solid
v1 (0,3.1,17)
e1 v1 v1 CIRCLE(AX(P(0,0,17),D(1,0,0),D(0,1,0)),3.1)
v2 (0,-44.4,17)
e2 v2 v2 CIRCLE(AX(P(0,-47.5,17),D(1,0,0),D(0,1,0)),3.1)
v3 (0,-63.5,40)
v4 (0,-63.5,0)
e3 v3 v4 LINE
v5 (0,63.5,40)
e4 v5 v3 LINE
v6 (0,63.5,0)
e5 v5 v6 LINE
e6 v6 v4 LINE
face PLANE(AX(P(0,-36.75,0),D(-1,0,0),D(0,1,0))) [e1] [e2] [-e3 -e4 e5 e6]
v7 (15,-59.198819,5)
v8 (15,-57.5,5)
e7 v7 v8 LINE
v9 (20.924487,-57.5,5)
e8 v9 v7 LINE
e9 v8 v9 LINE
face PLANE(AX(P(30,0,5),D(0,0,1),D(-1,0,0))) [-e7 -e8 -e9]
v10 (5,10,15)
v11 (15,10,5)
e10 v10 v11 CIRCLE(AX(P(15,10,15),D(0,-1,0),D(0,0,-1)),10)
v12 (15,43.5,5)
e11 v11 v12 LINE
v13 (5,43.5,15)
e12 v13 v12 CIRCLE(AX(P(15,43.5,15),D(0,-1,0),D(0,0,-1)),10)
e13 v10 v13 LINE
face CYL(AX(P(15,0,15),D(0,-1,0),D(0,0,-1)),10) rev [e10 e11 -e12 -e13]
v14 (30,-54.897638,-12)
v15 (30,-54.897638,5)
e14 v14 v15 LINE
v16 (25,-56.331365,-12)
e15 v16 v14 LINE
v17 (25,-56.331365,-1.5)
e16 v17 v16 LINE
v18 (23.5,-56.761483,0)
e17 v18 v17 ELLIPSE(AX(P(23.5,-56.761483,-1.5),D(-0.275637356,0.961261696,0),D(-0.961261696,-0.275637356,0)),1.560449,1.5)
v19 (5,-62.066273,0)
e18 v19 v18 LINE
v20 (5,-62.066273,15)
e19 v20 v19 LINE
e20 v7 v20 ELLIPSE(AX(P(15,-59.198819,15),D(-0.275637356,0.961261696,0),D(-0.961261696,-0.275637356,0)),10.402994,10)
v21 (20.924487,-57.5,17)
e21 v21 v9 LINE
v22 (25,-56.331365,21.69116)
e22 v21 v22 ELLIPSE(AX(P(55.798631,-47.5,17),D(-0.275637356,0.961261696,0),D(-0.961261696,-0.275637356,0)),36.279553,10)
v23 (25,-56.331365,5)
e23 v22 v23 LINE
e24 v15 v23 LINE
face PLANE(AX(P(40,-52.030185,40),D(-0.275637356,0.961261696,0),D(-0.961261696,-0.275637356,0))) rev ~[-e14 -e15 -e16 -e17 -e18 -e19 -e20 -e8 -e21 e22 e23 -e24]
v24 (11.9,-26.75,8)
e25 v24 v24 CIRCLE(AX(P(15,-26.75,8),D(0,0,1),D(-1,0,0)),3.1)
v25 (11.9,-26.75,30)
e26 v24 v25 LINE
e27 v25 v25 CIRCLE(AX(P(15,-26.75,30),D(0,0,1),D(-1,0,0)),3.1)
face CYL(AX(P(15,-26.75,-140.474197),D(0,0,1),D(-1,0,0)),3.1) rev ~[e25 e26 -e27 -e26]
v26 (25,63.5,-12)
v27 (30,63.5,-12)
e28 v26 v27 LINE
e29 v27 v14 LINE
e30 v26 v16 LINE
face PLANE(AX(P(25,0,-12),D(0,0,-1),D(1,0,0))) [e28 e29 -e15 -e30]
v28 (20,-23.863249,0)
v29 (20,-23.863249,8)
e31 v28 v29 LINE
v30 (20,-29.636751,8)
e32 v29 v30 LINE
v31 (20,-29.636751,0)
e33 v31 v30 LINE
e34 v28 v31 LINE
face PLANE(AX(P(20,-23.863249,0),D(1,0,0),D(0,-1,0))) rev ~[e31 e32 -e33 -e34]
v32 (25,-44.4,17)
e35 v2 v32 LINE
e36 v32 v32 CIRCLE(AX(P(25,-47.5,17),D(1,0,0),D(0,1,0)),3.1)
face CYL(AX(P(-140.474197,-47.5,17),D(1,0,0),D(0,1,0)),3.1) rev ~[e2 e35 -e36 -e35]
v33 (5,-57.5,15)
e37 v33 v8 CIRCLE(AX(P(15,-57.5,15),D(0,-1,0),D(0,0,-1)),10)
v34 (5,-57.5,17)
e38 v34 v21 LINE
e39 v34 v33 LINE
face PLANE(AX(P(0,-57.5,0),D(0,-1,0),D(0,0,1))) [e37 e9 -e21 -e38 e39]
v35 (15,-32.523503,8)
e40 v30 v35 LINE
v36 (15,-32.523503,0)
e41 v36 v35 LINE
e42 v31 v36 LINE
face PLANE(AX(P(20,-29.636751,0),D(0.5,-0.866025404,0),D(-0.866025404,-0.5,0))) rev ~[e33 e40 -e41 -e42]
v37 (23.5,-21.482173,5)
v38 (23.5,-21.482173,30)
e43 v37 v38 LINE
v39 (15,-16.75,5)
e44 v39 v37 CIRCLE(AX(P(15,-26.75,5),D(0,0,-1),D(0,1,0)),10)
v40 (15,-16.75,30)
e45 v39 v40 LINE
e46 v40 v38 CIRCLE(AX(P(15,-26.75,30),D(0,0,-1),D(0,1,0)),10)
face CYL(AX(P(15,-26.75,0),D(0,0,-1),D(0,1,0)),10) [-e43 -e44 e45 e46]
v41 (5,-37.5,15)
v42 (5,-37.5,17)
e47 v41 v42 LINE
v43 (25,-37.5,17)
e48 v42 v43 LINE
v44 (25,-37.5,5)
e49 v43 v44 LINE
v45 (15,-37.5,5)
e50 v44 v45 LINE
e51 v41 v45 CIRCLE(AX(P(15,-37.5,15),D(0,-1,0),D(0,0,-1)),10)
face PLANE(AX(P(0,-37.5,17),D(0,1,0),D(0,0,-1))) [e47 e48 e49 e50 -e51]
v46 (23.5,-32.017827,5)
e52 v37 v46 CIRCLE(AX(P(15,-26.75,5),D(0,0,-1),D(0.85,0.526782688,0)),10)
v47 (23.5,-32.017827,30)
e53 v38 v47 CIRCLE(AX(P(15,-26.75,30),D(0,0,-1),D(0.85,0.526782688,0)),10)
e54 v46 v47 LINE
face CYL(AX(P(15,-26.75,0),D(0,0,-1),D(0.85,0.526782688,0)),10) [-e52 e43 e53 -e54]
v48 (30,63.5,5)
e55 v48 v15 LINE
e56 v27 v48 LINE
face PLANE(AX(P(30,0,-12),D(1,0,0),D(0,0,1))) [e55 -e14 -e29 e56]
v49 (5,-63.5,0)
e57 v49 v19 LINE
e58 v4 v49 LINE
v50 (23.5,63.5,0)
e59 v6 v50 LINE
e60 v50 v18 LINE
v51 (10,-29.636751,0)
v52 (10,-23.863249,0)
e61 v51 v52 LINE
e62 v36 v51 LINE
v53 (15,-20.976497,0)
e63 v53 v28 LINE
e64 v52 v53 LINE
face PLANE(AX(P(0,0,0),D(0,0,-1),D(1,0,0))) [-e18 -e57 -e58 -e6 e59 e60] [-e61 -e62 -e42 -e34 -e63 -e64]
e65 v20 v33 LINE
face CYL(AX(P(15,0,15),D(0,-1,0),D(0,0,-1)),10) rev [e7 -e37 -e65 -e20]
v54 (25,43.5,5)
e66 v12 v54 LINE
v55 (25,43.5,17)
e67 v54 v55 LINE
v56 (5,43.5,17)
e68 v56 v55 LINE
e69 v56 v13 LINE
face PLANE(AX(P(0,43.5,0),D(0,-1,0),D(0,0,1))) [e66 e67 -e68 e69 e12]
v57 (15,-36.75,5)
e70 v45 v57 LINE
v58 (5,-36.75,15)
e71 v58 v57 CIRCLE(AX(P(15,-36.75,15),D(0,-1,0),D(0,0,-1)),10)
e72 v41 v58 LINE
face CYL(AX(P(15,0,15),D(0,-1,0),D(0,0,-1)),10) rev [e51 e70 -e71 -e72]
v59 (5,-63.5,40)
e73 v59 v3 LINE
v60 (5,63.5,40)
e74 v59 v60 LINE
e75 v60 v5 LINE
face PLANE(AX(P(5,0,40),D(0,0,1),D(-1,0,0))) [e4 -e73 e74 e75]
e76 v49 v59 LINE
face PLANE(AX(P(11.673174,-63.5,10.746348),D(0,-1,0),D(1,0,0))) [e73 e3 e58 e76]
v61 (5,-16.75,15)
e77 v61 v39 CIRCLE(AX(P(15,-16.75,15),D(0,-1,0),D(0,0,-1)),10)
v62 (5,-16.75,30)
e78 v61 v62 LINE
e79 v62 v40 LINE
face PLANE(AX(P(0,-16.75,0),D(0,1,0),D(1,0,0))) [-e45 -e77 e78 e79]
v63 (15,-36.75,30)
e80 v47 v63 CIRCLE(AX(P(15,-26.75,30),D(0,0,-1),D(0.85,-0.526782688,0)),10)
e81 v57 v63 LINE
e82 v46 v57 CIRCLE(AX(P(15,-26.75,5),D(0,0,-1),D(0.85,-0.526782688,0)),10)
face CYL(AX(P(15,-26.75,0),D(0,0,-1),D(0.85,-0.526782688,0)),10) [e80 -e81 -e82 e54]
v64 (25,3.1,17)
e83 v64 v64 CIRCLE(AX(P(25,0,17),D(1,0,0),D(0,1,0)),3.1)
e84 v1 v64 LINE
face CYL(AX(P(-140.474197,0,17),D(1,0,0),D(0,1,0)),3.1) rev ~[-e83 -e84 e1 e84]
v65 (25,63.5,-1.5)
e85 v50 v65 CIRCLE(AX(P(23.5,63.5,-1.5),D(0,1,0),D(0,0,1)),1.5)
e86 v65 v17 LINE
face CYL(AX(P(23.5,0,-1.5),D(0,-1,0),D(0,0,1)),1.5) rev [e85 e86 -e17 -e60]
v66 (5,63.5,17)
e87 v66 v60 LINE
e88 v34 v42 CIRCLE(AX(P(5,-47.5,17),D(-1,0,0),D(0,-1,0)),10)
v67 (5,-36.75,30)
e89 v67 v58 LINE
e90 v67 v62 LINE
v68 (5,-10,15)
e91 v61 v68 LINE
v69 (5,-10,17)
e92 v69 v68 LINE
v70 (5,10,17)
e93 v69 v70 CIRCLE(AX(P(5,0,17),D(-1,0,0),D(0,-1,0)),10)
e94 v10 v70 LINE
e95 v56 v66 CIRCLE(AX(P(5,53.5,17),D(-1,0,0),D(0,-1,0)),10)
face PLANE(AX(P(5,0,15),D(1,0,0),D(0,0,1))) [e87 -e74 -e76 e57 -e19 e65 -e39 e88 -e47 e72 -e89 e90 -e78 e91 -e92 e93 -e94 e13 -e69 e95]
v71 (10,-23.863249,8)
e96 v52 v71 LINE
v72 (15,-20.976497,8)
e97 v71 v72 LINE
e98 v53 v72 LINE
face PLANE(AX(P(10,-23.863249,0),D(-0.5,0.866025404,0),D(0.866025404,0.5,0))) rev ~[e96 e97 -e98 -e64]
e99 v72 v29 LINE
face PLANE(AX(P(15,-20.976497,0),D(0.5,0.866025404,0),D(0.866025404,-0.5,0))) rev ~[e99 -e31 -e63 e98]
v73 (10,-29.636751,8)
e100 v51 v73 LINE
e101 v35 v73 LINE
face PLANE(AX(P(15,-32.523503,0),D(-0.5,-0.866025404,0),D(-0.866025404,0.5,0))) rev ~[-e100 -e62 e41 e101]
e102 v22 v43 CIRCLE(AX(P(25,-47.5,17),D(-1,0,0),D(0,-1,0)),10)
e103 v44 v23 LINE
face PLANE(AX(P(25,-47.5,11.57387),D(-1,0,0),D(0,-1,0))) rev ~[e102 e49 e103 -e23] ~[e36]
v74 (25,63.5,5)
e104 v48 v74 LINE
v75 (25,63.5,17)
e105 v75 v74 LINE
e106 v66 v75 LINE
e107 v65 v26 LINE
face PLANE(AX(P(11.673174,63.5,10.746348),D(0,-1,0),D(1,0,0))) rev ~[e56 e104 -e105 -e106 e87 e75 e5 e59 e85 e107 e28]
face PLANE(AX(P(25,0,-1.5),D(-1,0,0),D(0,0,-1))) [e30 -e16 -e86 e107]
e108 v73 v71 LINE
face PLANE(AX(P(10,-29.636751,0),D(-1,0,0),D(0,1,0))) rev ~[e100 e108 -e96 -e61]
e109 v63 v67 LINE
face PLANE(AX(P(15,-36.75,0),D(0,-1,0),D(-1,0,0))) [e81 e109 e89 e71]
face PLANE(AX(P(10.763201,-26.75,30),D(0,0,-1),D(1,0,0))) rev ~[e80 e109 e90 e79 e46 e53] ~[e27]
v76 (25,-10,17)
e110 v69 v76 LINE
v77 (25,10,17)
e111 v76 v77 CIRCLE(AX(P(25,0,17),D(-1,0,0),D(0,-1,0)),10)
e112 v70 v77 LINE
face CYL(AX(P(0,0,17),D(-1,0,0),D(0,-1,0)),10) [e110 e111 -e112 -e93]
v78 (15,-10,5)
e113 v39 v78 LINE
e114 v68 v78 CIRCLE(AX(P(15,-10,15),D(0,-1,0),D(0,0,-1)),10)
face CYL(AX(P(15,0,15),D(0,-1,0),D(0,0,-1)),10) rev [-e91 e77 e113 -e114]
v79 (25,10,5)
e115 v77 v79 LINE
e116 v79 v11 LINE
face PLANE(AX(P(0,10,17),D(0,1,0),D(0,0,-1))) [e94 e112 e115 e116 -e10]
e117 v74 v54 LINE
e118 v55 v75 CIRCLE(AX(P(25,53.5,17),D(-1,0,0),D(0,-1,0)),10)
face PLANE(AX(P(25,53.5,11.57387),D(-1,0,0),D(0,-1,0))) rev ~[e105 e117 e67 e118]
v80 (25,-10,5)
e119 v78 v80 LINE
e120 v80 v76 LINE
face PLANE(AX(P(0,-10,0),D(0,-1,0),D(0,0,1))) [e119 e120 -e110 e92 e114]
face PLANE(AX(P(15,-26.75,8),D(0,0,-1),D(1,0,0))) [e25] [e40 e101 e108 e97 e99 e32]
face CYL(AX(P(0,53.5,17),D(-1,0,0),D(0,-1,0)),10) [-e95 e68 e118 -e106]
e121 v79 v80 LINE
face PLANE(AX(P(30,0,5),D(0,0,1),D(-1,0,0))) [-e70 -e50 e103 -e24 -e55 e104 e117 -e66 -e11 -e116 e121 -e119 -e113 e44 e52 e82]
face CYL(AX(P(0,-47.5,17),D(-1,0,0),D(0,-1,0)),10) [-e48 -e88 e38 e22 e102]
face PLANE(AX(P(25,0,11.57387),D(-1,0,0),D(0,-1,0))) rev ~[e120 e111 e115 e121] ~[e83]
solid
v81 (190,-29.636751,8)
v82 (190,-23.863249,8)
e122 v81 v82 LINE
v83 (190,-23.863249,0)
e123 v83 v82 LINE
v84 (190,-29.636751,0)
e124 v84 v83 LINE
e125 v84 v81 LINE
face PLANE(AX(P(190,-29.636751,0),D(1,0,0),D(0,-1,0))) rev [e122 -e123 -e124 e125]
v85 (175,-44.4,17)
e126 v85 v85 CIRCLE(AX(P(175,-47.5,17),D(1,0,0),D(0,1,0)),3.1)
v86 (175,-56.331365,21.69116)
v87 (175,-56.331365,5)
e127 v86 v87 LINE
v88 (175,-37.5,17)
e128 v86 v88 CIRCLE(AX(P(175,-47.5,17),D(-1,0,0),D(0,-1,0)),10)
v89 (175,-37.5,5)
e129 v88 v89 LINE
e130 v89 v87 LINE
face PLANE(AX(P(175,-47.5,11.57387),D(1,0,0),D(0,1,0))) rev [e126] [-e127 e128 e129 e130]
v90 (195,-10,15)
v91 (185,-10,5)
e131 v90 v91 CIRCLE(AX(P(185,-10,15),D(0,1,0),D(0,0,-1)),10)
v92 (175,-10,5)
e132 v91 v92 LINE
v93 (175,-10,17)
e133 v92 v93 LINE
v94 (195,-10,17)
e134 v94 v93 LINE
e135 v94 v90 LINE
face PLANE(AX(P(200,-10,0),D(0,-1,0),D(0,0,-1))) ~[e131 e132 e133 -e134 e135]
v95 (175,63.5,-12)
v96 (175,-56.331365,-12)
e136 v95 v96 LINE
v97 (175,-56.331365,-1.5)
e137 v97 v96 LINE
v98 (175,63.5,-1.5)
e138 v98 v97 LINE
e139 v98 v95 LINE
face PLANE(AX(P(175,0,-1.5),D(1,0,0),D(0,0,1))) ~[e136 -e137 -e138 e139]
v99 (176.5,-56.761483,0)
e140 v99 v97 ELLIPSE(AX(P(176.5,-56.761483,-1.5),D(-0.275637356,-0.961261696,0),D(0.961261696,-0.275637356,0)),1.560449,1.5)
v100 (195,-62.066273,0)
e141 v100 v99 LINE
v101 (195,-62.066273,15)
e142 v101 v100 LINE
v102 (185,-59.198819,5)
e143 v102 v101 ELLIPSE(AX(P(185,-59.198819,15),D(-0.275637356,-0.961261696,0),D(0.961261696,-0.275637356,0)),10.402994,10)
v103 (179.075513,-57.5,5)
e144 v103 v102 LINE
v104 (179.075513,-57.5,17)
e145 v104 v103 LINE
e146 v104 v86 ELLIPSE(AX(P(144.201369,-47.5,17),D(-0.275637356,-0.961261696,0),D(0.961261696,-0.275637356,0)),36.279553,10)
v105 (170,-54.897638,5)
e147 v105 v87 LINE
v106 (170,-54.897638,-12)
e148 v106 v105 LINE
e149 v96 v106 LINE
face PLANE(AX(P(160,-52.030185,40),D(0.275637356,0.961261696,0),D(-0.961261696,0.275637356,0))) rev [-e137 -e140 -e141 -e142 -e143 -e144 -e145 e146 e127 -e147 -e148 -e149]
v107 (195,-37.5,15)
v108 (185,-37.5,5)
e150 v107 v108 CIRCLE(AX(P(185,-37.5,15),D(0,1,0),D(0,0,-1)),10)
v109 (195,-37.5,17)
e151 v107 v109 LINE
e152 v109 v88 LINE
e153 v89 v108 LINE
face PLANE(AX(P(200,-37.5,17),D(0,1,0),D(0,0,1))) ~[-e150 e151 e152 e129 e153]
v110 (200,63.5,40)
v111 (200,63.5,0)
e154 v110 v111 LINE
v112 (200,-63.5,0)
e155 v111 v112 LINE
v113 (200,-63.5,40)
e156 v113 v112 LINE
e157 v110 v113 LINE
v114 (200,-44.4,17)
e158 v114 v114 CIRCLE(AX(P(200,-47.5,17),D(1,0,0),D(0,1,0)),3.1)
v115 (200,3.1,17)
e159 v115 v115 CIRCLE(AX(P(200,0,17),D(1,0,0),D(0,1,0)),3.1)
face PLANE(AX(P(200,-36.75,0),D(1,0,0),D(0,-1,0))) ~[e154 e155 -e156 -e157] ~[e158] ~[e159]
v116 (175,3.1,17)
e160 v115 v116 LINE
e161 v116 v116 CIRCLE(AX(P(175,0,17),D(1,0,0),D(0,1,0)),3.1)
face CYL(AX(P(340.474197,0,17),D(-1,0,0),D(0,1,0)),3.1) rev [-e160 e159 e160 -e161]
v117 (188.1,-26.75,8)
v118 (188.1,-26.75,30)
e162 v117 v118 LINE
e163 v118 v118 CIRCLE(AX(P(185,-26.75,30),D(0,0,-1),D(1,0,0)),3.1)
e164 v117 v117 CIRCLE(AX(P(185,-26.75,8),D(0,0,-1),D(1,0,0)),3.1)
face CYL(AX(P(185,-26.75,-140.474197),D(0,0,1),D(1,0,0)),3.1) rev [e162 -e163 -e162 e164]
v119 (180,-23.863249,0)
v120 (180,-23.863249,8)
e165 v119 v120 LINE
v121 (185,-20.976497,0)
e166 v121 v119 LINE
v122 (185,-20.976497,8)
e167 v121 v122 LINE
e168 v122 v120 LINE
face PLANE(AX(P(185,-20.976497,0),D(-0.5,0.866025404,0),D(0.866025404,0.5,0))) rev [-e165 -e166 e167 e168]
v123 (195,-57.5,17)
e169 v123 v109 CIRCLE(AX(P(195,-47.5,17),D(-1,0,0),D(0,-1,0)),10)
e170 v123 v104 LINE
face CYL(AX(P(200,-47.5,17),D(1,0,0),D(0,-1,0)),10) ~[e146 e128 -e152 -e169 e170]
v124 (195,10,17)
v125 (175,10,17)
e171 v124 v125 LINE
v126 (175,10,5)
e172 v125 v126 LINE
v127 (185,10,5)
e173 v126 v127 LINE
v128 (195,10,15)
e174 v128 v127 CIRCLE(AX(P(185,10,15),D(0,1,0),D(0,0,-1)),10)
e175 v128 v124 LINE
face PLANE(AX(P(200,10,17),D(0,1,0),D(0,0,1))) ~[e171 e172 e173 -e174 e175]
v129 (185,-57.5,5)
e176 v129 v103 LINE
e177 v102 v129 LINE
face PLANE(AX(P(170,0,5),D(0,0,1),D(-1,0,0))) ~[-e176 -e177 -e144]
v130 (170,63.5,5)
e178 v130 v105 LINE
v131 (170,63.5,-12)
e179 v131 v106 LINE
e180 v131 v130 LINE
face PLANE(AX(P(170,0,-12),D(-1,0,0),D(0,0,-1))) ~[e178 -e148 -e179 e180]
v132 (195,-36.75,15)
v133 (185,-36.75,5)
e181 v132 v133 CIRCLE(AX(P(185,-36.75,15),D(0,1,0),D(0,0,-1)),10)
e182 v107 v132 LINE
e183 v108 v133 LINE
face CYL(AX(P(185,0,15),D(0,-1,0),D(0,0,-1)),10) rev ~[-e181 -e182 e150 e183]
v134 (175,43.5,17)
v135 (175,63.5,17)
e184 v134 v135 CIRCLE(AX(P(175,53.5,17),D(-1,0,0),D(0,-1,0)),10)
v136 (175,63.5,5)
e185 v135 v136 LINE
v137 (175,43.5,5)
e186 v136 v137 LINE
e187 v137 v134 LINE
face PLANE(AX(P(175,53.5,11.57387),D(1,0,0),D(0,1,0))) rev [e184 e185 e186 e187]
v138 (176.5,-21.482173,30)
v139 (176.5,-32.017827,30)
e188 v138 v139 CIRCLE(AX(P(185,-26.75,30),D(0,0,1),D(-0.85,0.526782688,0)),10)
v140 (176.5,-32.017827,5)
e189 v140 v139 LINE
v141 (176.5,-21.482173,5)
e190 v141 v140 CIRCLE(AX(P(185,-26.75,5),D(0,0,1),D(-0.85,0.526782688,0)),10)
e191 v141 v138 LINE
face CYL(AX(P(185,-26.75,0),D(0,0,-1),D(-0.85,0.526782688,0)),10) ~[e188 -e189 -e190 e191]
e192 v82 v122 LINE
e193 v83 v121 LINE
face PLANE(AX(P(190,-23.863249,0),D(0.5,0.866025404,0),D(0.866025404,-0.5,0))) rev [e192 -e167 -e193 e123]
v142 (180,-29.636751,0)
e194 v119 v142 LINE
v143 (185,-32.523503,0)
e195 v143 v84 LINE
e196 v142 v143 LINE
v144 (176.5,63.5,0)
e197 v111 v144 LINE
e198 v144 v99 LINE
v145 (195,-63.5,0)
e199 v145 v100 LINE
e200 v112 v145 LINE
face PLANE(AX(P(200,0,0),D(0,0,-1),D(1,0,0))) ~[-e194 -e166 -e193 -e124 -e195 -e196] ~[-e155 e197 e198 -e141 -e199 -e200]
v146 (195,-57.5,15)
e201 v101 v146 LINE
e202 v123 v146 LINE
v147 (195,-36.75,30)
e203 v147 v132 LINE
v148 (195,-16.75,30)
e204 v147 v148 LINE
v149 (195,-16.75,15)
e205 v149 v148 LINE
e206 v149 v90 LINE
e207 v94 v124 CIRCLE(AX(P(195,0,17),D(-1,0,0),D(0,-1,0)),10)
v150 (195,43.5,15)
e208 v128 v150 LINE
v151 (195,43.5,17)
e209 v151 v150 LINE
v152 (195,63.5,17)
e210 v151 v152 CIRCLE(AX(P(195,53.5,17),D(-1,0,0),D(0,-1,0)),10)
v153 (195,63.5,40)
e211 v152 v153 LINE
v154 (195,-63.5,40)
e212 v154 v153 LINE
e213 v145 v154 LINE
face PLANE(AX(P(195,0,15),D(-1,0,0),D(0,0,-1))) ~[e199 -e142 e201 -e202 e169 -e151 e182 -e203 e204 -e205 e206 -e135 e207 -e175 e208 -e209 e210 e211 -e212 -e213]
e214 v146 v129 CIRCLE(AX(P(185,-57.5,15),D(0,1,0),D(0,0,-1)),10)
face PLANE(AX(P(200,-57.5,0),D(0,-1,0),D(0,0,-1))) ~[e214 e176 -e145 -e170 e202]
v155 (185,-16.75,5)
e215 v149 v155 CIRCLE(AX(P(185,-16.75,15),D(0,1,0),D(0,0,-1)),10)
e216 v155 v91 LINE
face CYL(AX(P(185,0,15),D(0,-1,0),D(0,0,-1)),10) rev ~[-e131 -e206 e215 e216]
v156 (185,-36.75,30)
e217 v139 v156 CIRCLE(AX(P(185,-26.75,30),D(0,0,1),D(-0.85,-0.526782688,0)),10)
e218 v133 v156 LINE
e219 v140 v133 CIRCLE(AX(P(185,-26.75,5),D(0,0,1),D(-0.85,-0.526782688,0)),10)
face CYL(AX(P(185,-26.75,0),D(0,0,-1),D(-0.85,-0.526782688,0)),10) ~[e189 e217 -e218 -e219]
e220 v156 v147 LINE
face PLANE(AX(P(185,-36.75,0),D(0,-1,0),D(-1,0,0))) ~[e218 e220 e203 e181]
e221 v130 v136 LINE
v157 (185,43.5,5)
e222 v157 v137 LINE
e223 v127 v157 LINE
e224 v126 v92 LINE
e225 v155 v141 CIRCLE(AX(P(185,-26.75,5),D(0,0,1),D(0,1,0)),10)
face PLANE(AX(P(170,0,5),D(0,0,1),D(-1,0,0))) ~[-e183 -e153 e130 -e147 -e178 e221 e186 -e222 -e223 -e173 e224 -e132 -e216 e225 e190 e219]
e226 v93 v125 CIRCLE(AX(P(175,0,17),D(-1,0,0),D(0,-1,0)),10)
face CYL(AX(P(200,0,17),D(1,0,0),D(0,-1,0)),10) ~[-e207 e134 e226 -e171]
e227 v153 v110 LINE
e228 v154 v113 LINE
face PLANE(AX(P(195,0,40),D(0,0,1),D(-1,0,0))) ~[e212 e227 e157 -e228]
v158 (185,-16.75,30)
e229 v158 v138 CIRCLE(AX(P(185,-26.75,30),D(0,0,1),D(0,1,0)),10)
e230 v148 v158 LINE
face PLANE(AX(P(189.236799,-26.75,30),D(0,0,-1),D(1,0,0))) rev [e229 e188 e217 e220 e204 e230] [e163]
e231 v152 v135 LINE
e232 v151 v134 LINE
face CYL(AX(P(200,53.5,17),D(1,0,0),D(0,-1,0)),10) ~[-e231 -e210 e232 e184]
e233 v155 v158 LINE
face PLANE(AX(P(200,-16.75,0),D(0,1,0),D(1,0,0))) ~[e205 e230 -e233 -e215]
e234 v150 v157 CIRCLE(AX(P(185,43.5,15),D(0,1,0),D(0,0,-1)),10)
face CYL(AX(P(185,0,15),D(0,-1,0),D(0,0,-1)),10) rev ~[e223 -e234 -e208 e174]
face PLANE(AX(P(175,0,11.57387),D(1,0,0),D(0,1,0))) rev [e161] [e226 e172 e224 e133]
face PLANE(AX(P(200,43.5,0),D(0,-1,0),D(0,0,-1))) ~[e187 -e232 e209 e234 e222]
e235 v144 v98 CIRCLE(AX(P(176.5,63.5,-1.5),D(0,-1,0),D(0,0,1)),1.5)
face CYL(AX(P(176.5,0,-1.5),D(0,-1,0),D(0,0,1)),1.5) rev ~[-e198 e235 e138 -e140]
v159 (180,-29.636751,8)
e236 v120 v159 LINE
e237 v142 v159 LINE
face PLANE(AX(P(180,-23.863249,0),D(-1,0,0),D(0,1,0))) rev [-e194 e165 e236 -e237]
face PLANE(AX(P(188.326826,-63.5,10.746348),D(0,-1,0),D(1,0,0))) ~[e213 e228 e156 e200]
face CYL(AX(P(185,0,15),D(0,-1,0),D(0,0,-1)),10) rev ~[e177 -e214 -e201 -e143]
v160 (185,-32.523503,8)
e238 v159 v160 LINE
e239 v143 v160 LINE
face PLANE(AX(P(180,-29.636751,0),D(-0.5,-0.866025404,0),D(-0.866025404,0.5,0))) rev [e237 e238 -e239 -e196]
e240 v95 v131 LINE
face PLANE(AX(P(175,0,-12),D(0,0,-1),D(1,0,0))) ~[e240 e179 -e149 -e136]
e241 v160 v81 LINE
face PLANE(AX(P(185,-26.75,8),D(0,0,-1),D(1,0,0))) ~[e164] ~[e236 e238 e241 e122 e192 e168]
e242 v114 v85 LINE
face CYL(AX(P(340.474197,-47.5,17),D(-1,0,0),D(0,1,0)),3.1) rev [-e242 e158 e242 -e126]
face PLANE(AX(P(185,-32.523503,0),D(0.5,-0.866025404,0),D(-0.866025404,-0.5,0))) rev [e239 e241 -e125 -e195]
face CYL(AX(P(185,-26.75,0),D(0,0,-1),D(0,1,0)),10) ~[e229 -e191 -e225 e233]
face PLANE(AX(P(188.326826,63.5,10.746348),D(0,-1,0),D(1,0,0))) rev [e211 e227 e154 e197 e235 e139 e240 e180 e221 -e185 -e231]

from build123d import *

# Parameters (mm, degrees)
F1_DEPTH  = 63.5
F4_DEPTH  = 25
F5_D      = 6.2
F8_DEPTH  = 30
F9_D      = 6.2
F11_DEPTH = 8
F14_DEPTH = 52.001


# Not quite as in the source:
# - a feature names something its author has since deleted; it is built from what else it names


with BuildPart() as f1:
    # F0 (on Front) → F1 (new body, symmetric)
    with BuildSketch(Plane.XZ):
        with BuildLine():
            Line((5, 40), (0, 40))
            Line((0, 40), (0, 0))
            Line((0, 0), (23.5, 0))
            ThreePointArc((23.5, 0), (24.5606601718, -0.4393398282), (25, -1.5))
            Line((25, -1.5), (25, -12))
            Line((25, -12), (30, -12))
            Line((30, -12), (30, 5))
            Line((30, 5), (15, 5))
            ThreePointArc((15, 5), (7.9289321881, 7.9289321881), (5, 15))
            Line((5, 15), (5, 40))
        make_face()
    extrude(amount=F1_DEPTH, both=True)

    # F3 (on face) → F4 (join)
    with BuildSketch(Plane(origin=(0, 0, 0), x_dir=(0, -1, 0), z_dir=(-1, 0, 0))):
        with BuildLine():
            Line((37.5, 17), (37.5, 0))
            Line((37.5, 0), (57.5, 0))
            Line((57.5, 0), (57.5, 17))
            ThreePointArc((57.5, 17), (47.5, 27), (37.5, 17))
        make_face()
        with BuildLine():
            ThreePointArc((10, 17), (0, 27), (-10, 17))
            Line((-10, 17), (-10, 0))
            Line((-10, 0), (10, 0))
            Line((10, 0), (10, 17))
        make_face()
        with BuildLine():
            Line((-63.5, 0), (-43.5, 0))
            Line((-43.5, 0), (-43.5, 17))
            ThreePointArc((-43.5, 17), (-53.5, 27), (-63.5, 17))
            Line((-63.5, 17), (-63.5, 0))
        make_face()
    extrude(amount=-F4_DEPTH)

    # F5 (through all)
    with Locations(Plane(origin=(0, 0, 0), x_dir=(0, -1, 0), z_dir=(-1, 0, 0))):
        with Locations((0, 17), (47.5, 17)):
            Hole(F5_D / 2)

    # F7 (on face) → F8 (join)
    with BuildSketch(Plane(origin=(0, 0, 0), x_dir=(1, 0, 0), z_dir=(0, 0, -1))):
        with BuildLine():
            Line((0, 16.75), (15, 16.75))
            ThreePointArc((15, 16.75), (19.8642435813, 18.0127730725), (23.5, 21.4821731236))
            Line((23.5, 21.4821731236), (23.5, 32.0178268764))
            ThreePointArc((23.5, 32.0178268764), (19.8642435813, 35.4872269275), (15, 36.75))
            Line((15, 36.75), (0, 36.75))
            Line((0, 36.75), (0, 16.75))
        make_face()
        with BuildLine():
            Line((23.5, 32.0178268764), (23.5, 21.4821731236))
            ThreePointArc((23.5, 21.4821731236), (25, 26.75), (23.5, 32.0178268764))
        make_face()
    extrude(amount=-F8_DEPTH)

    # F9 (through all)
    with Locations(Plane(origin=(0, 0, 0), x_dir=(1, 0, 0), z_dir=(0, 0, -1))):
        with Locations((15, 26.75)):
            Hole(F9_D / 2)

    # F10 (on face) → F11 (cut)
    with BuildSketch(Plane(origin=(0, 0, 0), x_dir=(1, 0, 0), z_dir=(0, 0, -1))):
        Polygon((15, 20.9764973081), (20, 23.8632486541), (20, 29.6367513459), (15, 32.5235026919), (10, 29.6367513459), (10, 23.8632486541), align=None)
    extrude(amount=-F11_DEPTH, mode=Mode.SUBTRACT)

    # F13 (on face) → F14 (cut, through all)
    with BuildSketch(Plane.XY.offset(40)):
        Polygon((40, -52.0301845696), (5, -62.0662730712), (5, -63.5), (40, -63.5), align=None)
    extrude(amount=-F14_DEPTH, mode=Mode.SUBTRACT)


with BuildPart() as f15_1:
    # F15: instance of F1
    add(f1.part.mirror(Plane.YZ.offset(100)))


solid = Compound([f1.part, f15_1.part])
